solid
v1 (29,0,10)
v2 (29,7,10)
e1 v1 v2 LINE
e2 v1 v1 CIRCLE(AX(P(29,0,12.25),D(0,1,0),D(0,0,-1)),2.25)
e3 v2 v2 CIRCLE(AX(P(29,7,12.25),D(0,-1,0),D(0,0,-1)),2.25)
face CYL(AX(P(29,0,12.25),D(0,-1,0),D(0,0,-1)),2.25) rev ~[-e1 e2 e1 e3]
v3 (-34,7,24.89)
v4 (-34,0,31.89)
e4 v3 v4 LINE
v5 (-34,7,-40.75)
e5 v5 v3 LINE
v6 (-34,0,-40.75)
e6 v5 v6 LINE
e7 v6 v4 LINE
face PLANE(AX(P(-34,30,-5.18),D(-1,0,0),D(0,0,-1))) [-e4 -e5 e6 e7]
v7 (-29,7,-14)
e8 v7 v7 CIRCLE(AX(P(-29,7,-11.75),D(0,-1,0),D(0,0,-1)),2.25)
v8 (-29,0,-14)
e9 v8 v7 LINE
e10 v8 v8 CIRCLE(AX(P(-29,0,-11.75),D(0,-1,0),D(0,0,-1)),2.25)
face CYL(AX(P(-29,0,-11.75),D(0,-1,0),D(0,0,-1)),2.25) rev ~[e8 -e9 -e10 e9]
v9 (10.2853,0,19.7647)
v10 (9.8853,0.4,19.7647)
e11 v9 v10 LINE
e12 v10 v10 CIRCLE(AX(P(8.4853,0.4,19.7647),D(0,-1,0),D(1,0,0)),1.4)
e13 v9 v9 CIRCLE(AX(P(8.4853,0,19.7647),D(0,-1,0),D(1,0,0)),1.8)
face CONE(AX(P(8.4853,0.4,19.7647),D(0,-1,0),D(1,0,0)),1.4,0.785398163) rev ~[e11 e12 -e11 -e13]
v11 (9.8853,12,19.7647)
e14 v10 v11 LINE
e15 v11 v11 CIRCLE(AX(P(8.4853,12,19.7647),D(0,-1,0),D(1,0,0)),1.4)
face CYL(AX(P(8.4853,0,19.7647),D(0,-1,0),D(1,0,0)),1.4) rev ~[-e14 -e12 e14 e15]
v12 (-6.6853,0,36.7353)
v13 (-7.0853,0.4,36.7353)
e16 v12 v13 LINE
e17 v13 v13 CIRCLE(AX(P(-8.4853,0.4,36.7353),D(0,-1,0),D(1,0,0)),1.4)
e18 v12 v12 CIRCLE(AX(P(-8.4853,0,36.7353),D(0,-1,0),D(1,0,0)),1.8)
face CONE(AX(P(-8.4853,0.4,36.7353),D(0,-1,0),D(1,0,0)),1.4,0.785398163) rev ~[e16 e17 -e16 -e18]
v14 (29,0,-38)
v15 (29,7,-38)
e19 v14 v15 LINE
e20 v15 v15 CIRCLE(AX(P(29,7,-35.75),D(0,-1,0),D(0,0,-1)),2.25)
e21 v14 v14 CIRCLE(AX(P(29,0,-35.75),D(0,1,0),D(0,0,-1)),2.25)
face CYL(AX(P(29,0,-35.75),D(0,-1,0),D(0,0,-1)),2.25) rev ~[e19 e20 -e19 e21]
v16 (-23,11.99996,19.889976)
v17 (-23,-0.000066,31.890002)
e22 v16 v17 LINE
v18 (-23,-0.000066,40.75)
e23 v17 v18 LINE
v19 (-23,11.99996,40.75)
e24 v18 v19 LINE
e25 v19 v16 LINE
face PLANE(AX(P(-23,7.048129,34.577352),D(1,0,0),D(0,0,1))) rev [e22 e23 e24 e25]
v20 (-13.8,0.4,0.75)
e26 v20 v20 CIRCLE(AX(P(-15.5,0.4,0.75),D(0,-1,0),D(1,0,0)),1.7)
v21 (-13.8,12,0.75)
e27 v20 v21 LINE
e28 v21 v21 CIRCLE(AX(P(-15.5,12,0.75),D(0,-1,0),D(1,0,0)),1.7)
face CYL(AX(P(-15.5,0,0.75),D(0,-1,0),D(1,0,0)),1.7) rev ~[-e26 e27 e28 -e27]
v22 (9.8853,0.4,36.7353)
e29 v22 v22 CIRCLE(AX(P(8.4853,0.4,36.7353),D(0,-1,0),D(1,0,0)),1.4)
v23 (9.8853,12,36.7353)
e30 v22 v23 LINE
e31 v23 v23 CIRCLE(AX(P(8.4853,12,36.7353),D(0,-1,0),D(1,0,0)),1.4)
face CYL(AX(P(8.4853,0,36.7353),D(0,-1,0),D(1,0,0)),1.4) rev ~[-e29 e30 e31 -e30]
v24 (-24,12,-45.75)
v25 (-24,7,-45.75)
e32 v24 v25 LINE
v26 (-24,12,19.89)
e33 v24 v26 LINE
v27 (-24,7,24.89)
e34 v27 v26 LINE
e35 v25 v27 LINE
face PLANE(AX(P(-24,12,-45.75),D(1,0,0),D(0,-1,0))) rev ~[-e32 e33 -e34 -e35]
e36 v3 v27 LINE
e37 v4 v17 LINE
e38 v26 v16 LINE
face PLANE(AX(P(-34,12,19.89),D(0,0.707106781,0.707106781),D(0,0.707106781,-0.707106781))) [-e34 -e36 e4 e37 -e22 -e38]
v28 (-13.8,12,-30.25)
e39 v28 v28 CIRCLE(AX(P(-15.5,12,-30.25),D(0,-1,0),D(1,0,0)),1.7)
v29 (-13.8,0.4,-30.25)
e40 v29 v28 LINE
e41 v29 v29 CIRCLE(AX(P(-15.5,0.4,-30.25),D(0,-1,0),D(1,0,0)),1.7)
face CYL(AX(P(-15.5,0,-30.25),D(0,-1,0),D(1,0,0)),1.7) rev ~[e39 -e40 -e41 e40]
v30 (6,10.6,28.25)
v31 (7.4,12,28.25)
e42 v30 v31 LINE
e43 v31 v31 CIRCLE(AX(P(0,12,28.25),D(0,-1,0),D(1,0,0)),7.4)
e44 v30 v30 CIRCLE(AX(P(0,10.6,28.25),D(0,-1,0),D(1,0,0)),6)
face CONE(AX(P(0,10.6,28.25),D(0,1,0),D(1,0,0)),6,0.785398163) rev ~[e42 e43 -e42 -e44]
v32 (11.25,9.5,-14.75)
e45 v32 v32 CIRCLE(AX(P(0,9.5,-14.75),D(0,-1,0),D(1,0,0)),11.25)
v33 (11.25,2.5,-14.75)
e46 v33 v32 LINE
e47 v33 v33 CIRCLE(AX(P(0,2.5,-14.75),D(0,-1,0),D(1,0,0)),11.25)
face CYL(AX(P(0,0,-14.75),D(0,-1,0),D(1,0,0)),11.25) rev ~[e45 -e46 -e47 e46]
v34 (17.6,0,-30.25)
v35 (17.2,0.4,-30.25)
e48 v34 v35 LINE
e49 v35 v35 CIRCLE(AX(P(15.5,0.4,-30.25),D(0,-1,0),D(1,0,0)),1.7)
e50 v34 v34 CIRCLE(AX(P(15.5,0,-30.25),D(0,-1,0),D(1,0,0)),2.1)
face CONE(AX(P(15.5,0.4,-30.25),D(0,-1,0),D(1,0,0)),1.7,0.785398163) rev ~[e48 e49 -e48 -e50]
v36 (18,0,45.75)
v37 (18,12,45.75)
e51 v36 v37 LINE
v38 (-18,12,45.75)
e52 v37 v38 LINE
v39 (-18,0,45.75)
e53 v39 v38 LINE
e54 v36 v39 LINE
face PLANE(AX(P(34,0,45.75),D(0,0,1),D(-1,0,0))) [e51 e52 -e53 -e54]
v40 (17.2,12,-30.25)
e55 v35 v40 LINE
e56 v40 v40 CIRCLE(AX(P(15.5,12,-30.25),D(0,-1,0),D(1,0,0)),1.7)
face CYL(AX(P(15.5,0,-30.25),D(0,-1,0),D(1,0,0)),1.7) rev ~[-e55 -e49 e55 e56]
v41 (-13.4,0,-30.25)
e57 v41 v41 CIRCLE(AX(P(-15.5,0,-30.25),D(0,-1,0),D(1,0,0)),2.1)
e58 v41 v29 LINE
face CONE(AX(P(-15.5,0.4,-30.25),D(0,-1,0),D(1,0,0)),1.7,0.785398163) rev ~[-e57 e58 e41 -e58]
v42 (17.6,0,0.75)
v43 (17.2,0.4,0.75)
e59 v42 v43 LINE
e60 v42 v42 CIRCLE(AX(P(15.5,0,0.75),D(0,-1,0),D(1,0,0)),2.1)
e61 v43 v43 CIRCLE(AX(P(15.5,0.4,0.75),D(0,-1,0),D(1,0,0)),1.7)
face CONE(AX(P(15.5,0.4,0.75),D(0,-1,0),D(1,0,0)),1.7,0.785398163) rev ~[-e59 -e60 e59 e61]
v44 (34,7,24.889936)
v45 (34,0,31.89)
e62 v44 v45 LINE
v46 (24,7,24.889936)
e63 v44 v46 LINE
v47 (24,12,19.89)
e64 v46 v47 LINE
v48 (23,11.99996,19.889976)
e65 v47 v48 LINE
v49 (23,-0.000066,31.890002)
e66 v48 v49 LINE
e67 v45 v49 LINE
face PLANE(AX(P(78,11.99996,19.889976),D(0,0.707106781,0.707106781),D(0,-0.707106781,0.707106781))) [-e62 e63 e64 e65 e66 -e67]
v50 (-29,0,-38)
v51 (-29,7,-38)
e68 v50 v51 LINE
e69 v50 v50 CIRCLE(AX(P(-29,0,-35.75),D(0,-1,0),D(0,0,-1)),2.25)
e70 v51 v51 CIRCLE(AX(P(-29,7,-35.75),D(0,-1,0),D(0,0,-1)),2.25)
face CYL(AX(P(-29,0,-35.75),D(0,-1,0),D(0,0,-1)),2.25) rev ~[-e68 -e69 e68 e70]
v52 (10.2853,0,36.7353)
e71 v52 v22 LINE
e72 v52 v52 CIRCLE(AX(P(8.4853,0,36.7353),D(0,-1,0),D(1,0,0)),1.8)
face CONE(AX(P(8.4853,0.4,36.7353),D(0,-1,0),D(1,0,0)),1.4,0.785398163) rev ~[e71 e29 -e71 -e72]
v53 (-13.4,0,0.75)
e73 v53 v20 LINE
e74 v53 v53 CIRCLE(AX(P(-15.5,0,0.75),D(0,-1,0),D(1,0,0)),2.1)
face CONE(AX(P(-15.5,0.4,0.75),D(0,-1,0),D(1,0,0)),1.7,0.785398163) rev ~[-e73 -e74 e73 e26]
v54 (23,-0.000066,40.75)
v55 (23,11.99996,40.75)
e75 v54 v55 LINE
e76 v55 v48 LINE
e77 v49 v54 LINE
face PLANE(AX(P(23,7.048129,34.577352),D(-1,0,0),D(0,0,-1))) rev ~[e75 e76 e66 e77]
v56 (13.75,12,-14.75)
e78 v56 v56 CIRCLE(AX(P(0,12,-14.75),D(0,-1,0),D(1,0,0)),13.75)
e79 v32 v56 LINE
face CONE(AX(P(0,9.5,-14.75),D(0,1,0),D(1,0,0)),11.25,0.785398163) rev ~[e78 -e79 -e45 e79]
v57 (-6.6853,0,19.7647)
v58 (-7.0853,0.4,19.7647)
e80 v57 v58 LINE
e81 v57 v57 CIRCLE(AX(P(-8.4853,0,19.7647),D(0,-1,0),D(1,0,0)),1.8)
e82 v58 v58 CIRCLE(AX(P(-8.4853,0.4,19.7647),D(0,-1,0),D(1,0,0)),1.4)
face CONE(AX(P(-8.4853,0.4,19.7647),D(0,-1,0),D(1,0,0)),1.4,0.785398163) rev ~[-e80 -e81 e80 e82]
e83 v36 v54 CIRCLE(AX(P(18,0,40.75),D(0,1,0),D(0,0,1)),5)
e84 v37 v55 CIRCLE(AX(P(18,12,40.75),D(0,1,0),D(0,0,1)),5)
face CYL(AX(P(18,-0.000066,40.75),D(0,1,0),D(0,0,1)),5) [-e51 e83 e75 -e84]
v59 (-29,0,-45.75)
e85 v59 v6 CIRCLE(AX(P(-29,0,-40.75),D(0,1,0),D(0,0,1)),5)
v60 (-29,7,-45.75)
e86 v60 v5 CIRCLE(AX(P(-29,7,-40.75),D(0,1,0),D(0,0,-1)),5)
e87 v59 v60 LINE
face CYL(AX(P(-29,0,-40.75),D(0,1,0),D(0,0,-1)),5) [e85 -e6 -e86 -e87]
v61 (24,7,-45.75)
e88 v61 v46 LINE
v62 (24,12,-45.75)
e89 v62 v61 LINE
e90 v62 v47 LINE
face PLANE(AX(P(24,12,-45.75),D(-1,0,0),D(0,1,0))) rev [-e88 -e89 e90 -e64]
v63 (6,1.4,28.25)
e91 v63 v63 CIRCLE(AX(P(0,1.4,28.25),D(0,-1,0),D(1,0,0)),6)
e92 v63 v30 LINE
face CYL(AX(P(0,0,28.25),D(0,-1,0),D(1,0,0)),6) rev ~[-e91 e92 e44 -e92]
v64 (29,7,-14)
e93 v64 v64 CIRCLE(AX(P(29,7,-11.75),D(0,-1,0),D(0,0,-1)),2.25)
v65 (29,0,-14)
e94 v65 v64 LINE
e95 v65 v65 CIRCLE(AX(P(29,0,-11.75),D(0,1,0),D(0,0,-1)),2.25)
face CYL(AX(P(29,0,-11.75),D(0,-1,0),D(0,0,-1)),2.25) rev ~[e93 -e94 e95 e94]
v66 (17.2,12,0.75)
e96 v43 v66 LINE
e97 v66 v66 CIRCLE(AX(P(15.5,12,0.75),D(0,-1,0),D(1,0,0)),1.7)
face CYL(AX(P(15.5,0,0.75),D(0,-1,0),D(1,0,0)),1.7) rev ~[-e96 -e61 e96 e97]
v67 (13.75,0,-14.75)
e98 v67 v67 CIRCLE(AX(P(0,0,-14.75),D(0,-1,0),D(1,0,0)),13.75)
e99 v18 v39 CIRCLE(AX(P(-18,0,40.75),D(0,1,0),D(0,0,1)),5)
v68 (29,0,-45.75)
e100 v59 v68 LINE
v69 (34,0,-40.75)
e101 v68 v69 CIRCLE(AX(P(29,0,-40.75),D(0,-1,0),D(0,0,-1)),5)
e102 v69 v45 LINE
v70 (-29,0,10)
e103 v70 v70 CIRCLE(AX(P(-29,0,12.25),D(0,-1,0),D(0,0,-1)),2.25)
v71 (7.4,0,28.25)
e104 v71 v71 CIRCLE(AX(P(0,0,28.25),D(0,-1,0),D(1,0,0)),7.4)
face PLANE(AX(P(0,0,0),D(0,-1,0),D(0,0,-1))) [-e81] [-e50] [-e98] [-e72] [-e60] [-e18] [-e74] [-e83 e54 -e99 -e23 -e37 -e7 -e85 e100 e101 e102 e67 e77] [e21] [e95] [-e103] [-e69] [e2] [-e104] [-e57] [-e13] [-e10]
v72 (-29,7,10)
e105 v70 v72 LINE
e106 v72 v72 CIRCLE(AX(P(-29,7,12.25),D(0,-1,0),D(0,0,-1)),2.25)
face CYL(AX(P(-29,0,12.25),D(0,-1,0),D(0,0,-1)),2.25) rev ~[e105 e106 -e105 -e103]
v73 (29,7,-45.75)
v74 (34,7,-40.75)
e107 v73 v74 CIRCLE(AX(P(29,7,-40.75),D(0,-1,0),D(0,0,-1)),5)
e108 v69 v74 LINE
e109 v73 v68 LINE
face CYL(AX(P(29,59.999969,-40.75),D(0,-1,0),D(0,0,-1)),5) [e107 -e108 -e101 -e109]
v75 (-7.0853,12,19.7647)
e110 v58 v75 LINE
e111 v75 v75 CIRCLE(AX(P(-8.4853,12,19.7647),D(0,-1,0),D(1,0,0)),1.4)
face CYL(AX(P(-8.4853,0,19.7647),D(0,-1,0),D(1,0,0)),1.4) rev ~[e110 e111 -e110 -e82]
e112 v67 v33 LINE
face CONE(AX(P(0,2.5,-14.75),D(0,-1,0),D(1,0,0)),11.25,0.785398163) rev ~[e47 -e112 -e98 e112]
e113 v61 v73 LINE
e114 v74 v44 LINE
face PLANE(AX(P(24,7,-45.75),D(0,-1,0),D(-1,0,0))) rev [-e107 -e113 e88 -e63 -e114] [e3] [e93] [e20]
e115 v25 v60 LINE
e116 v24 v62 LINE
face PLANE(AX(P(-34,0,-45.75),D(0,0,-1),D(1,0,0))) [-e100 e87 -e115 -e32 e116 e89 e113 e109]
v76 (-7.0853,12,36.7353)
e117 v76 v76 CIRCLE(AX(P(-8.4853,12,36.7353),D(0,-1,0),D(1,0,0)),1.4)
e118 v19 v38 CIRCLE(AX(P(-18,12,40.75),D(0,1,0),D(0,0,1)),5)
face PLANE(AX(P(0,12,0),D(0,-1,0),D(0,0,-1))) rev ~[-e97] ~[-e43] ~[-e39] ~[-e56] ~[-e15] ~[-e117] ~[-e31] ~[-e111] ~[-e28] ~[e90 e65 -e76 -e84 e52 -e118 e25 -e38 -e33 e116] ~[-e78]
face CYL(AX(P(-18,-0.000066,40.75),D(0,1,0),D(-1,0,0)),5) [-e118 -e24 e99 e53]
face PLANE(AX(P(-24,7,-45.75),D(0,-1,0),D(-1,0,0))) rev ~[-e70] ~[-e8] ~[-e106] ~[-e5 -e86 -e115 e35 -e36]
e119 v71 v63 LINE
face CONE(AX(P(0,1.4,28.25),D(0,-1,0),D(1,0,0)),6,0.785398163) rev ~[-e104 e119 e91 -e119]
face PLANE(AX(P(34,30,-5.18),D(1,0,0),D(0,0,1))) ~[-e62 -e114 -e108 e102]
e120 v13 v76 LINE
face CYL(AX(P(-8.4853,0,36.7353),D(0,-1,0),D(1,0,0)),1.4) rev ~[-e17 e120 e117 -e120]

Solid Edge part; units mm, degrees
sketch "Sketch1" plane through (0, 0, 0) normal (0, -1, 0) x (1, 0, 0)
  line L0 (-34, -45.75) -> (34, -45.75)
  line L1 (34, -45.75) -> (34, 45.75)
  line L2 (34, 45.75) -> (-34, 45.75)
  line L3 (-34, 45.75) -> (-34, -45.75)
  dimension "D1" = 68
  dimension "D2" = 91.5
extrude "Protrusion1" add sketch "Sketch1" against normal blind 12
sketch "Sketch2" plane through (0, 0, 0) normal (0, -1, 0) x (1, 0, 0)
  circle A0 centre (0, -14.75) radius 11.25
  circle A1 centre (-15.5, 0.75) radius 1.7
  circle A2 centre (-15.5, -30.25) radius 1.7
  circle A3 centre (15.5, -30.25) radius 1.7
  circle A4 centre (15.5, 0.75) radius 1.7
  dimension "D1" = 22.5
  dimension "D2" = 3.4
  dimension "D3" = 31
  dimension "D4" = 31
extrude "Cutout1" cut sketch "Sketch2" against normal through all
sketch "Sketch3" plane through (0, 0, 0) normal (0, -1, 0) x (1, 0, 0)
  circle A0 centre (8.4853, 36.7353) radius 1.4
  circle A1 centre (8.4853, 19.7647) radius 1.4
  circle A2 centre (-8.4853, 19.7647) radius 1.4
  circle A3 centre (-8.4853, 36.7353) radius 1.4
  circle A4 centre (0, 28.25) radius 6
  dimension "D1" = 8.4853
extrude "Cutout2" cut sketch "Sketch3" against normal through all
sketch "Sketch4" plane through (-34, 6, 0) normal (-1, 0, 0) x (0, 0, -1)
  line L0 (-19.89, -6) -> (45.75, -71.64)
  line L1 (45.75, -71.64) -> (45.75, -6)
  line L2 (45.75, -6) -> (-19.89, -6)
  dimension "D1" = 25.86
extrude "Extrusionsausprägung_2" add sketch "Sketch4" against normal blind 10
mirror "Mirror1" about plane through (0, 0, 0) normal (1, 0, 0) of "Extrusionsausprägung_2"
sketch "Sketch5" plane through (-34, 38.82, 0) normal (-1, 0, 0) x (0, 0, -1)
  circle A0 centre (33.7465, 1.4635) radius 1.875
  circle A1 centre (19.6043, 15.6057) radius 1.875
  dimension "D1" = 3.75
  dimension "D2" = 20
  dimension "D3" = 42.14
  dimension "D4" = 32.83
extrude "Extrusionsausschnitt_3" cut sketch "Sketch5" against normal blind 14
sketch "Sketch6" plane through (-34, 38.82, 0) normal (-1, 0, 0) x (0, 0, -1)
  line L0 (45.75, -38.82) -> (-31.89, 38.82)
  line L1 (-31.89, 38.82) -> (-17.75, 38.82)
  line L2 (-17.75, 38.82) -> (45.75, -24.68)
  line L3 (45.75, -24.68) -> (45.75, -38.82)
  dimension "D1" = 14.14
extrude "Extrusionsausprägung_4" add sketch "Sketch6" along normal blind 44
mirror "Mirror2" about plane through (0, 0, 0) normal (1, 0, 0) of "Extrusionsausprägung_4"
sketch "Sketch7" plane through (-54, 31.75, -14) normal (0, -0.7071068, -0.7071068) x (1, 0, 0)
  circle A0 centre (-14, 10.2613) radius 4
  circle A1 centre (-14, -19.7387) radius 4
  dimension "D1" = 8
  dimension "D2" = 34.64
  dimension "D3" = 30
  dimension "D4" = 10
extrude "Cutout3" cut sketch "Sketch7" against normal up to next
mirror "Mirror3" about plane through (0, 0, 0) normal (1, 0, 0) of "Cutout3"
sketch "Sketch8" plane through (-78, 38.82, -6.93) normal (-1, 0, 0) x (0, 0.7071068, -0.7071068)
  line L0 (29.953, 0) -> (42.4264, 12.4734)
  dimension "D1" = 60
extrude "Cutout4" cut sketch "Sketch8" against normal through all material side at (-78, 60.05, -36.93)
sketch "Sketch9" plane through (78, 30, -5.18) normal (1, 0, 0) x (0, -0.7071068, 0.7071068)
  line L0 (30.4551, -4.9992) -> (47.4257, -4.9992)
  line L1 (47.4257, -4.9992) -> (57.2262, -14.7997)
  line L2 (57.2262, -14.7997) -> (48.7409, -23.285)
  line L3 (48.7409, -23.285) -> (30.4551, -4.9992)
extrude "Extrusionsausschnitt_6" cut sketch "Sketch9" against normal blind 55
mirror "Mirror4" about plane through (0, 0, 0) normal (1, 0, 0) of "Extrusionsausschnitt_6"
fillet "Verrundung_1" radius 5 4 edges at (23, 6, 45.75) (-23, 6, 45.75) (34, 30, -45.75) (-34, 30, -45.75)
chamfer "Chamfer1" distance 0.5 angle 45 2 edges at (-34, 23.2143, -17.7293) (-34, 37.3565, -31.8715)
chamfer "Fase_2" distance 0.4 angle 45 4 edges at (-17.2, 0, -30.25) (-17.2, 0, 0.75) (13.8, 0, 0.75) (13.8, 0, -30.25)
chamfer "Fase_3" distance 0.4 angle 45 4 edges at (-9.8853, 0, 19.7647) (-9.8853, 0, 36.7353) (7.0853, 0, 36.7353) (7.0853, 0, 19.7647)
chamfer "Fase_4" distance 2.5 angle 45 2 edges at (-11.25, 0, -14.75) (0, 12, -3.5)
chamfer "Fase_5" distance 1.4 angle 45 2 edges at (-6, 0, 28.25) (0, 12, 34.25)
chamfer "Fase_7" distance 1 angle 45 4 edges at (-68, 34.3926, -2.5026) (-68, 55.6058, -23.7158) (68, 34.3926, -2.5026) (68, 55.6058, -23.7158)
sketch "Sketch10" plane through (-78, 30, -5.18) normal (-1, 0, 0) x (0, 0.7071068, -0.7071068)
  line L0 (-30.4551, -4.9992) -> (-20.4566, 4.9992)
extrude "Extrusionsausschnitt_8" cut sketch "Sketch10" against normal blind 44 material side at (-78, 11.95, 12.82)
mirror "Mirror5" about plane through (0, 0, 0) normal (1, 0, 0) of "Extrusionsausschnitt_8"
sketch "Sketch11" plane through (-78, 36, -11.18) normal (-1, 0, 0) x (0, 0.7071068, -0.7071068)
  line L0 (-38.9404, -4.9992) -> (7.4741, 41.4152)
extrude "Cutout6" cut sketch "Sketch11" against normal through all material side at (-78, 12.05, -12.93)
sketch "Sketch12" plane through (0, 0, 0) normal (0, -1, 0) x (0, 0, -1)
  circle A0 centre (35.75, -29) radius 2.25
  circle A1 centre (11.75, -29) radius 2.25
  circle A2 centre (-12.25, -29) radius 2.25
  dimension "D1" = 4.5
  dimension "D2" = 5
  dimension "D3" = 24
  dimension "D4" = 24
  dimension "D5" = 10
extrude "Cutout7" cut sketch "Sketch12" against normal through all
mirror "Mirror6" about plane through (0, 0, 0) normal (1, 0, 0) of "Cutout7"
sketch "Sketch13" plane through (0, 6, -45.75) normal (0, 0, -1) x (1, 0, 0)
  line L0 (-34, -6) -> (-24, -6)
  line L1 (-24, -6) -> (-24, -1)
  line L2 (-24, -1) -> (-34, -1)
  line L3 (-34, -1) -> (-34, -6)
  dimension "D1" = 10
  dimension "D2" = 5
extrude "Cutout8" cut sketch "Sketch13" against normal through all
mirror "Mirror7" about plane through (0, 0, 0) normal (1, 0, 0) of "Cutout8"
properties part number "A3.A1.A1.1" material "Nylon, allgemein"
